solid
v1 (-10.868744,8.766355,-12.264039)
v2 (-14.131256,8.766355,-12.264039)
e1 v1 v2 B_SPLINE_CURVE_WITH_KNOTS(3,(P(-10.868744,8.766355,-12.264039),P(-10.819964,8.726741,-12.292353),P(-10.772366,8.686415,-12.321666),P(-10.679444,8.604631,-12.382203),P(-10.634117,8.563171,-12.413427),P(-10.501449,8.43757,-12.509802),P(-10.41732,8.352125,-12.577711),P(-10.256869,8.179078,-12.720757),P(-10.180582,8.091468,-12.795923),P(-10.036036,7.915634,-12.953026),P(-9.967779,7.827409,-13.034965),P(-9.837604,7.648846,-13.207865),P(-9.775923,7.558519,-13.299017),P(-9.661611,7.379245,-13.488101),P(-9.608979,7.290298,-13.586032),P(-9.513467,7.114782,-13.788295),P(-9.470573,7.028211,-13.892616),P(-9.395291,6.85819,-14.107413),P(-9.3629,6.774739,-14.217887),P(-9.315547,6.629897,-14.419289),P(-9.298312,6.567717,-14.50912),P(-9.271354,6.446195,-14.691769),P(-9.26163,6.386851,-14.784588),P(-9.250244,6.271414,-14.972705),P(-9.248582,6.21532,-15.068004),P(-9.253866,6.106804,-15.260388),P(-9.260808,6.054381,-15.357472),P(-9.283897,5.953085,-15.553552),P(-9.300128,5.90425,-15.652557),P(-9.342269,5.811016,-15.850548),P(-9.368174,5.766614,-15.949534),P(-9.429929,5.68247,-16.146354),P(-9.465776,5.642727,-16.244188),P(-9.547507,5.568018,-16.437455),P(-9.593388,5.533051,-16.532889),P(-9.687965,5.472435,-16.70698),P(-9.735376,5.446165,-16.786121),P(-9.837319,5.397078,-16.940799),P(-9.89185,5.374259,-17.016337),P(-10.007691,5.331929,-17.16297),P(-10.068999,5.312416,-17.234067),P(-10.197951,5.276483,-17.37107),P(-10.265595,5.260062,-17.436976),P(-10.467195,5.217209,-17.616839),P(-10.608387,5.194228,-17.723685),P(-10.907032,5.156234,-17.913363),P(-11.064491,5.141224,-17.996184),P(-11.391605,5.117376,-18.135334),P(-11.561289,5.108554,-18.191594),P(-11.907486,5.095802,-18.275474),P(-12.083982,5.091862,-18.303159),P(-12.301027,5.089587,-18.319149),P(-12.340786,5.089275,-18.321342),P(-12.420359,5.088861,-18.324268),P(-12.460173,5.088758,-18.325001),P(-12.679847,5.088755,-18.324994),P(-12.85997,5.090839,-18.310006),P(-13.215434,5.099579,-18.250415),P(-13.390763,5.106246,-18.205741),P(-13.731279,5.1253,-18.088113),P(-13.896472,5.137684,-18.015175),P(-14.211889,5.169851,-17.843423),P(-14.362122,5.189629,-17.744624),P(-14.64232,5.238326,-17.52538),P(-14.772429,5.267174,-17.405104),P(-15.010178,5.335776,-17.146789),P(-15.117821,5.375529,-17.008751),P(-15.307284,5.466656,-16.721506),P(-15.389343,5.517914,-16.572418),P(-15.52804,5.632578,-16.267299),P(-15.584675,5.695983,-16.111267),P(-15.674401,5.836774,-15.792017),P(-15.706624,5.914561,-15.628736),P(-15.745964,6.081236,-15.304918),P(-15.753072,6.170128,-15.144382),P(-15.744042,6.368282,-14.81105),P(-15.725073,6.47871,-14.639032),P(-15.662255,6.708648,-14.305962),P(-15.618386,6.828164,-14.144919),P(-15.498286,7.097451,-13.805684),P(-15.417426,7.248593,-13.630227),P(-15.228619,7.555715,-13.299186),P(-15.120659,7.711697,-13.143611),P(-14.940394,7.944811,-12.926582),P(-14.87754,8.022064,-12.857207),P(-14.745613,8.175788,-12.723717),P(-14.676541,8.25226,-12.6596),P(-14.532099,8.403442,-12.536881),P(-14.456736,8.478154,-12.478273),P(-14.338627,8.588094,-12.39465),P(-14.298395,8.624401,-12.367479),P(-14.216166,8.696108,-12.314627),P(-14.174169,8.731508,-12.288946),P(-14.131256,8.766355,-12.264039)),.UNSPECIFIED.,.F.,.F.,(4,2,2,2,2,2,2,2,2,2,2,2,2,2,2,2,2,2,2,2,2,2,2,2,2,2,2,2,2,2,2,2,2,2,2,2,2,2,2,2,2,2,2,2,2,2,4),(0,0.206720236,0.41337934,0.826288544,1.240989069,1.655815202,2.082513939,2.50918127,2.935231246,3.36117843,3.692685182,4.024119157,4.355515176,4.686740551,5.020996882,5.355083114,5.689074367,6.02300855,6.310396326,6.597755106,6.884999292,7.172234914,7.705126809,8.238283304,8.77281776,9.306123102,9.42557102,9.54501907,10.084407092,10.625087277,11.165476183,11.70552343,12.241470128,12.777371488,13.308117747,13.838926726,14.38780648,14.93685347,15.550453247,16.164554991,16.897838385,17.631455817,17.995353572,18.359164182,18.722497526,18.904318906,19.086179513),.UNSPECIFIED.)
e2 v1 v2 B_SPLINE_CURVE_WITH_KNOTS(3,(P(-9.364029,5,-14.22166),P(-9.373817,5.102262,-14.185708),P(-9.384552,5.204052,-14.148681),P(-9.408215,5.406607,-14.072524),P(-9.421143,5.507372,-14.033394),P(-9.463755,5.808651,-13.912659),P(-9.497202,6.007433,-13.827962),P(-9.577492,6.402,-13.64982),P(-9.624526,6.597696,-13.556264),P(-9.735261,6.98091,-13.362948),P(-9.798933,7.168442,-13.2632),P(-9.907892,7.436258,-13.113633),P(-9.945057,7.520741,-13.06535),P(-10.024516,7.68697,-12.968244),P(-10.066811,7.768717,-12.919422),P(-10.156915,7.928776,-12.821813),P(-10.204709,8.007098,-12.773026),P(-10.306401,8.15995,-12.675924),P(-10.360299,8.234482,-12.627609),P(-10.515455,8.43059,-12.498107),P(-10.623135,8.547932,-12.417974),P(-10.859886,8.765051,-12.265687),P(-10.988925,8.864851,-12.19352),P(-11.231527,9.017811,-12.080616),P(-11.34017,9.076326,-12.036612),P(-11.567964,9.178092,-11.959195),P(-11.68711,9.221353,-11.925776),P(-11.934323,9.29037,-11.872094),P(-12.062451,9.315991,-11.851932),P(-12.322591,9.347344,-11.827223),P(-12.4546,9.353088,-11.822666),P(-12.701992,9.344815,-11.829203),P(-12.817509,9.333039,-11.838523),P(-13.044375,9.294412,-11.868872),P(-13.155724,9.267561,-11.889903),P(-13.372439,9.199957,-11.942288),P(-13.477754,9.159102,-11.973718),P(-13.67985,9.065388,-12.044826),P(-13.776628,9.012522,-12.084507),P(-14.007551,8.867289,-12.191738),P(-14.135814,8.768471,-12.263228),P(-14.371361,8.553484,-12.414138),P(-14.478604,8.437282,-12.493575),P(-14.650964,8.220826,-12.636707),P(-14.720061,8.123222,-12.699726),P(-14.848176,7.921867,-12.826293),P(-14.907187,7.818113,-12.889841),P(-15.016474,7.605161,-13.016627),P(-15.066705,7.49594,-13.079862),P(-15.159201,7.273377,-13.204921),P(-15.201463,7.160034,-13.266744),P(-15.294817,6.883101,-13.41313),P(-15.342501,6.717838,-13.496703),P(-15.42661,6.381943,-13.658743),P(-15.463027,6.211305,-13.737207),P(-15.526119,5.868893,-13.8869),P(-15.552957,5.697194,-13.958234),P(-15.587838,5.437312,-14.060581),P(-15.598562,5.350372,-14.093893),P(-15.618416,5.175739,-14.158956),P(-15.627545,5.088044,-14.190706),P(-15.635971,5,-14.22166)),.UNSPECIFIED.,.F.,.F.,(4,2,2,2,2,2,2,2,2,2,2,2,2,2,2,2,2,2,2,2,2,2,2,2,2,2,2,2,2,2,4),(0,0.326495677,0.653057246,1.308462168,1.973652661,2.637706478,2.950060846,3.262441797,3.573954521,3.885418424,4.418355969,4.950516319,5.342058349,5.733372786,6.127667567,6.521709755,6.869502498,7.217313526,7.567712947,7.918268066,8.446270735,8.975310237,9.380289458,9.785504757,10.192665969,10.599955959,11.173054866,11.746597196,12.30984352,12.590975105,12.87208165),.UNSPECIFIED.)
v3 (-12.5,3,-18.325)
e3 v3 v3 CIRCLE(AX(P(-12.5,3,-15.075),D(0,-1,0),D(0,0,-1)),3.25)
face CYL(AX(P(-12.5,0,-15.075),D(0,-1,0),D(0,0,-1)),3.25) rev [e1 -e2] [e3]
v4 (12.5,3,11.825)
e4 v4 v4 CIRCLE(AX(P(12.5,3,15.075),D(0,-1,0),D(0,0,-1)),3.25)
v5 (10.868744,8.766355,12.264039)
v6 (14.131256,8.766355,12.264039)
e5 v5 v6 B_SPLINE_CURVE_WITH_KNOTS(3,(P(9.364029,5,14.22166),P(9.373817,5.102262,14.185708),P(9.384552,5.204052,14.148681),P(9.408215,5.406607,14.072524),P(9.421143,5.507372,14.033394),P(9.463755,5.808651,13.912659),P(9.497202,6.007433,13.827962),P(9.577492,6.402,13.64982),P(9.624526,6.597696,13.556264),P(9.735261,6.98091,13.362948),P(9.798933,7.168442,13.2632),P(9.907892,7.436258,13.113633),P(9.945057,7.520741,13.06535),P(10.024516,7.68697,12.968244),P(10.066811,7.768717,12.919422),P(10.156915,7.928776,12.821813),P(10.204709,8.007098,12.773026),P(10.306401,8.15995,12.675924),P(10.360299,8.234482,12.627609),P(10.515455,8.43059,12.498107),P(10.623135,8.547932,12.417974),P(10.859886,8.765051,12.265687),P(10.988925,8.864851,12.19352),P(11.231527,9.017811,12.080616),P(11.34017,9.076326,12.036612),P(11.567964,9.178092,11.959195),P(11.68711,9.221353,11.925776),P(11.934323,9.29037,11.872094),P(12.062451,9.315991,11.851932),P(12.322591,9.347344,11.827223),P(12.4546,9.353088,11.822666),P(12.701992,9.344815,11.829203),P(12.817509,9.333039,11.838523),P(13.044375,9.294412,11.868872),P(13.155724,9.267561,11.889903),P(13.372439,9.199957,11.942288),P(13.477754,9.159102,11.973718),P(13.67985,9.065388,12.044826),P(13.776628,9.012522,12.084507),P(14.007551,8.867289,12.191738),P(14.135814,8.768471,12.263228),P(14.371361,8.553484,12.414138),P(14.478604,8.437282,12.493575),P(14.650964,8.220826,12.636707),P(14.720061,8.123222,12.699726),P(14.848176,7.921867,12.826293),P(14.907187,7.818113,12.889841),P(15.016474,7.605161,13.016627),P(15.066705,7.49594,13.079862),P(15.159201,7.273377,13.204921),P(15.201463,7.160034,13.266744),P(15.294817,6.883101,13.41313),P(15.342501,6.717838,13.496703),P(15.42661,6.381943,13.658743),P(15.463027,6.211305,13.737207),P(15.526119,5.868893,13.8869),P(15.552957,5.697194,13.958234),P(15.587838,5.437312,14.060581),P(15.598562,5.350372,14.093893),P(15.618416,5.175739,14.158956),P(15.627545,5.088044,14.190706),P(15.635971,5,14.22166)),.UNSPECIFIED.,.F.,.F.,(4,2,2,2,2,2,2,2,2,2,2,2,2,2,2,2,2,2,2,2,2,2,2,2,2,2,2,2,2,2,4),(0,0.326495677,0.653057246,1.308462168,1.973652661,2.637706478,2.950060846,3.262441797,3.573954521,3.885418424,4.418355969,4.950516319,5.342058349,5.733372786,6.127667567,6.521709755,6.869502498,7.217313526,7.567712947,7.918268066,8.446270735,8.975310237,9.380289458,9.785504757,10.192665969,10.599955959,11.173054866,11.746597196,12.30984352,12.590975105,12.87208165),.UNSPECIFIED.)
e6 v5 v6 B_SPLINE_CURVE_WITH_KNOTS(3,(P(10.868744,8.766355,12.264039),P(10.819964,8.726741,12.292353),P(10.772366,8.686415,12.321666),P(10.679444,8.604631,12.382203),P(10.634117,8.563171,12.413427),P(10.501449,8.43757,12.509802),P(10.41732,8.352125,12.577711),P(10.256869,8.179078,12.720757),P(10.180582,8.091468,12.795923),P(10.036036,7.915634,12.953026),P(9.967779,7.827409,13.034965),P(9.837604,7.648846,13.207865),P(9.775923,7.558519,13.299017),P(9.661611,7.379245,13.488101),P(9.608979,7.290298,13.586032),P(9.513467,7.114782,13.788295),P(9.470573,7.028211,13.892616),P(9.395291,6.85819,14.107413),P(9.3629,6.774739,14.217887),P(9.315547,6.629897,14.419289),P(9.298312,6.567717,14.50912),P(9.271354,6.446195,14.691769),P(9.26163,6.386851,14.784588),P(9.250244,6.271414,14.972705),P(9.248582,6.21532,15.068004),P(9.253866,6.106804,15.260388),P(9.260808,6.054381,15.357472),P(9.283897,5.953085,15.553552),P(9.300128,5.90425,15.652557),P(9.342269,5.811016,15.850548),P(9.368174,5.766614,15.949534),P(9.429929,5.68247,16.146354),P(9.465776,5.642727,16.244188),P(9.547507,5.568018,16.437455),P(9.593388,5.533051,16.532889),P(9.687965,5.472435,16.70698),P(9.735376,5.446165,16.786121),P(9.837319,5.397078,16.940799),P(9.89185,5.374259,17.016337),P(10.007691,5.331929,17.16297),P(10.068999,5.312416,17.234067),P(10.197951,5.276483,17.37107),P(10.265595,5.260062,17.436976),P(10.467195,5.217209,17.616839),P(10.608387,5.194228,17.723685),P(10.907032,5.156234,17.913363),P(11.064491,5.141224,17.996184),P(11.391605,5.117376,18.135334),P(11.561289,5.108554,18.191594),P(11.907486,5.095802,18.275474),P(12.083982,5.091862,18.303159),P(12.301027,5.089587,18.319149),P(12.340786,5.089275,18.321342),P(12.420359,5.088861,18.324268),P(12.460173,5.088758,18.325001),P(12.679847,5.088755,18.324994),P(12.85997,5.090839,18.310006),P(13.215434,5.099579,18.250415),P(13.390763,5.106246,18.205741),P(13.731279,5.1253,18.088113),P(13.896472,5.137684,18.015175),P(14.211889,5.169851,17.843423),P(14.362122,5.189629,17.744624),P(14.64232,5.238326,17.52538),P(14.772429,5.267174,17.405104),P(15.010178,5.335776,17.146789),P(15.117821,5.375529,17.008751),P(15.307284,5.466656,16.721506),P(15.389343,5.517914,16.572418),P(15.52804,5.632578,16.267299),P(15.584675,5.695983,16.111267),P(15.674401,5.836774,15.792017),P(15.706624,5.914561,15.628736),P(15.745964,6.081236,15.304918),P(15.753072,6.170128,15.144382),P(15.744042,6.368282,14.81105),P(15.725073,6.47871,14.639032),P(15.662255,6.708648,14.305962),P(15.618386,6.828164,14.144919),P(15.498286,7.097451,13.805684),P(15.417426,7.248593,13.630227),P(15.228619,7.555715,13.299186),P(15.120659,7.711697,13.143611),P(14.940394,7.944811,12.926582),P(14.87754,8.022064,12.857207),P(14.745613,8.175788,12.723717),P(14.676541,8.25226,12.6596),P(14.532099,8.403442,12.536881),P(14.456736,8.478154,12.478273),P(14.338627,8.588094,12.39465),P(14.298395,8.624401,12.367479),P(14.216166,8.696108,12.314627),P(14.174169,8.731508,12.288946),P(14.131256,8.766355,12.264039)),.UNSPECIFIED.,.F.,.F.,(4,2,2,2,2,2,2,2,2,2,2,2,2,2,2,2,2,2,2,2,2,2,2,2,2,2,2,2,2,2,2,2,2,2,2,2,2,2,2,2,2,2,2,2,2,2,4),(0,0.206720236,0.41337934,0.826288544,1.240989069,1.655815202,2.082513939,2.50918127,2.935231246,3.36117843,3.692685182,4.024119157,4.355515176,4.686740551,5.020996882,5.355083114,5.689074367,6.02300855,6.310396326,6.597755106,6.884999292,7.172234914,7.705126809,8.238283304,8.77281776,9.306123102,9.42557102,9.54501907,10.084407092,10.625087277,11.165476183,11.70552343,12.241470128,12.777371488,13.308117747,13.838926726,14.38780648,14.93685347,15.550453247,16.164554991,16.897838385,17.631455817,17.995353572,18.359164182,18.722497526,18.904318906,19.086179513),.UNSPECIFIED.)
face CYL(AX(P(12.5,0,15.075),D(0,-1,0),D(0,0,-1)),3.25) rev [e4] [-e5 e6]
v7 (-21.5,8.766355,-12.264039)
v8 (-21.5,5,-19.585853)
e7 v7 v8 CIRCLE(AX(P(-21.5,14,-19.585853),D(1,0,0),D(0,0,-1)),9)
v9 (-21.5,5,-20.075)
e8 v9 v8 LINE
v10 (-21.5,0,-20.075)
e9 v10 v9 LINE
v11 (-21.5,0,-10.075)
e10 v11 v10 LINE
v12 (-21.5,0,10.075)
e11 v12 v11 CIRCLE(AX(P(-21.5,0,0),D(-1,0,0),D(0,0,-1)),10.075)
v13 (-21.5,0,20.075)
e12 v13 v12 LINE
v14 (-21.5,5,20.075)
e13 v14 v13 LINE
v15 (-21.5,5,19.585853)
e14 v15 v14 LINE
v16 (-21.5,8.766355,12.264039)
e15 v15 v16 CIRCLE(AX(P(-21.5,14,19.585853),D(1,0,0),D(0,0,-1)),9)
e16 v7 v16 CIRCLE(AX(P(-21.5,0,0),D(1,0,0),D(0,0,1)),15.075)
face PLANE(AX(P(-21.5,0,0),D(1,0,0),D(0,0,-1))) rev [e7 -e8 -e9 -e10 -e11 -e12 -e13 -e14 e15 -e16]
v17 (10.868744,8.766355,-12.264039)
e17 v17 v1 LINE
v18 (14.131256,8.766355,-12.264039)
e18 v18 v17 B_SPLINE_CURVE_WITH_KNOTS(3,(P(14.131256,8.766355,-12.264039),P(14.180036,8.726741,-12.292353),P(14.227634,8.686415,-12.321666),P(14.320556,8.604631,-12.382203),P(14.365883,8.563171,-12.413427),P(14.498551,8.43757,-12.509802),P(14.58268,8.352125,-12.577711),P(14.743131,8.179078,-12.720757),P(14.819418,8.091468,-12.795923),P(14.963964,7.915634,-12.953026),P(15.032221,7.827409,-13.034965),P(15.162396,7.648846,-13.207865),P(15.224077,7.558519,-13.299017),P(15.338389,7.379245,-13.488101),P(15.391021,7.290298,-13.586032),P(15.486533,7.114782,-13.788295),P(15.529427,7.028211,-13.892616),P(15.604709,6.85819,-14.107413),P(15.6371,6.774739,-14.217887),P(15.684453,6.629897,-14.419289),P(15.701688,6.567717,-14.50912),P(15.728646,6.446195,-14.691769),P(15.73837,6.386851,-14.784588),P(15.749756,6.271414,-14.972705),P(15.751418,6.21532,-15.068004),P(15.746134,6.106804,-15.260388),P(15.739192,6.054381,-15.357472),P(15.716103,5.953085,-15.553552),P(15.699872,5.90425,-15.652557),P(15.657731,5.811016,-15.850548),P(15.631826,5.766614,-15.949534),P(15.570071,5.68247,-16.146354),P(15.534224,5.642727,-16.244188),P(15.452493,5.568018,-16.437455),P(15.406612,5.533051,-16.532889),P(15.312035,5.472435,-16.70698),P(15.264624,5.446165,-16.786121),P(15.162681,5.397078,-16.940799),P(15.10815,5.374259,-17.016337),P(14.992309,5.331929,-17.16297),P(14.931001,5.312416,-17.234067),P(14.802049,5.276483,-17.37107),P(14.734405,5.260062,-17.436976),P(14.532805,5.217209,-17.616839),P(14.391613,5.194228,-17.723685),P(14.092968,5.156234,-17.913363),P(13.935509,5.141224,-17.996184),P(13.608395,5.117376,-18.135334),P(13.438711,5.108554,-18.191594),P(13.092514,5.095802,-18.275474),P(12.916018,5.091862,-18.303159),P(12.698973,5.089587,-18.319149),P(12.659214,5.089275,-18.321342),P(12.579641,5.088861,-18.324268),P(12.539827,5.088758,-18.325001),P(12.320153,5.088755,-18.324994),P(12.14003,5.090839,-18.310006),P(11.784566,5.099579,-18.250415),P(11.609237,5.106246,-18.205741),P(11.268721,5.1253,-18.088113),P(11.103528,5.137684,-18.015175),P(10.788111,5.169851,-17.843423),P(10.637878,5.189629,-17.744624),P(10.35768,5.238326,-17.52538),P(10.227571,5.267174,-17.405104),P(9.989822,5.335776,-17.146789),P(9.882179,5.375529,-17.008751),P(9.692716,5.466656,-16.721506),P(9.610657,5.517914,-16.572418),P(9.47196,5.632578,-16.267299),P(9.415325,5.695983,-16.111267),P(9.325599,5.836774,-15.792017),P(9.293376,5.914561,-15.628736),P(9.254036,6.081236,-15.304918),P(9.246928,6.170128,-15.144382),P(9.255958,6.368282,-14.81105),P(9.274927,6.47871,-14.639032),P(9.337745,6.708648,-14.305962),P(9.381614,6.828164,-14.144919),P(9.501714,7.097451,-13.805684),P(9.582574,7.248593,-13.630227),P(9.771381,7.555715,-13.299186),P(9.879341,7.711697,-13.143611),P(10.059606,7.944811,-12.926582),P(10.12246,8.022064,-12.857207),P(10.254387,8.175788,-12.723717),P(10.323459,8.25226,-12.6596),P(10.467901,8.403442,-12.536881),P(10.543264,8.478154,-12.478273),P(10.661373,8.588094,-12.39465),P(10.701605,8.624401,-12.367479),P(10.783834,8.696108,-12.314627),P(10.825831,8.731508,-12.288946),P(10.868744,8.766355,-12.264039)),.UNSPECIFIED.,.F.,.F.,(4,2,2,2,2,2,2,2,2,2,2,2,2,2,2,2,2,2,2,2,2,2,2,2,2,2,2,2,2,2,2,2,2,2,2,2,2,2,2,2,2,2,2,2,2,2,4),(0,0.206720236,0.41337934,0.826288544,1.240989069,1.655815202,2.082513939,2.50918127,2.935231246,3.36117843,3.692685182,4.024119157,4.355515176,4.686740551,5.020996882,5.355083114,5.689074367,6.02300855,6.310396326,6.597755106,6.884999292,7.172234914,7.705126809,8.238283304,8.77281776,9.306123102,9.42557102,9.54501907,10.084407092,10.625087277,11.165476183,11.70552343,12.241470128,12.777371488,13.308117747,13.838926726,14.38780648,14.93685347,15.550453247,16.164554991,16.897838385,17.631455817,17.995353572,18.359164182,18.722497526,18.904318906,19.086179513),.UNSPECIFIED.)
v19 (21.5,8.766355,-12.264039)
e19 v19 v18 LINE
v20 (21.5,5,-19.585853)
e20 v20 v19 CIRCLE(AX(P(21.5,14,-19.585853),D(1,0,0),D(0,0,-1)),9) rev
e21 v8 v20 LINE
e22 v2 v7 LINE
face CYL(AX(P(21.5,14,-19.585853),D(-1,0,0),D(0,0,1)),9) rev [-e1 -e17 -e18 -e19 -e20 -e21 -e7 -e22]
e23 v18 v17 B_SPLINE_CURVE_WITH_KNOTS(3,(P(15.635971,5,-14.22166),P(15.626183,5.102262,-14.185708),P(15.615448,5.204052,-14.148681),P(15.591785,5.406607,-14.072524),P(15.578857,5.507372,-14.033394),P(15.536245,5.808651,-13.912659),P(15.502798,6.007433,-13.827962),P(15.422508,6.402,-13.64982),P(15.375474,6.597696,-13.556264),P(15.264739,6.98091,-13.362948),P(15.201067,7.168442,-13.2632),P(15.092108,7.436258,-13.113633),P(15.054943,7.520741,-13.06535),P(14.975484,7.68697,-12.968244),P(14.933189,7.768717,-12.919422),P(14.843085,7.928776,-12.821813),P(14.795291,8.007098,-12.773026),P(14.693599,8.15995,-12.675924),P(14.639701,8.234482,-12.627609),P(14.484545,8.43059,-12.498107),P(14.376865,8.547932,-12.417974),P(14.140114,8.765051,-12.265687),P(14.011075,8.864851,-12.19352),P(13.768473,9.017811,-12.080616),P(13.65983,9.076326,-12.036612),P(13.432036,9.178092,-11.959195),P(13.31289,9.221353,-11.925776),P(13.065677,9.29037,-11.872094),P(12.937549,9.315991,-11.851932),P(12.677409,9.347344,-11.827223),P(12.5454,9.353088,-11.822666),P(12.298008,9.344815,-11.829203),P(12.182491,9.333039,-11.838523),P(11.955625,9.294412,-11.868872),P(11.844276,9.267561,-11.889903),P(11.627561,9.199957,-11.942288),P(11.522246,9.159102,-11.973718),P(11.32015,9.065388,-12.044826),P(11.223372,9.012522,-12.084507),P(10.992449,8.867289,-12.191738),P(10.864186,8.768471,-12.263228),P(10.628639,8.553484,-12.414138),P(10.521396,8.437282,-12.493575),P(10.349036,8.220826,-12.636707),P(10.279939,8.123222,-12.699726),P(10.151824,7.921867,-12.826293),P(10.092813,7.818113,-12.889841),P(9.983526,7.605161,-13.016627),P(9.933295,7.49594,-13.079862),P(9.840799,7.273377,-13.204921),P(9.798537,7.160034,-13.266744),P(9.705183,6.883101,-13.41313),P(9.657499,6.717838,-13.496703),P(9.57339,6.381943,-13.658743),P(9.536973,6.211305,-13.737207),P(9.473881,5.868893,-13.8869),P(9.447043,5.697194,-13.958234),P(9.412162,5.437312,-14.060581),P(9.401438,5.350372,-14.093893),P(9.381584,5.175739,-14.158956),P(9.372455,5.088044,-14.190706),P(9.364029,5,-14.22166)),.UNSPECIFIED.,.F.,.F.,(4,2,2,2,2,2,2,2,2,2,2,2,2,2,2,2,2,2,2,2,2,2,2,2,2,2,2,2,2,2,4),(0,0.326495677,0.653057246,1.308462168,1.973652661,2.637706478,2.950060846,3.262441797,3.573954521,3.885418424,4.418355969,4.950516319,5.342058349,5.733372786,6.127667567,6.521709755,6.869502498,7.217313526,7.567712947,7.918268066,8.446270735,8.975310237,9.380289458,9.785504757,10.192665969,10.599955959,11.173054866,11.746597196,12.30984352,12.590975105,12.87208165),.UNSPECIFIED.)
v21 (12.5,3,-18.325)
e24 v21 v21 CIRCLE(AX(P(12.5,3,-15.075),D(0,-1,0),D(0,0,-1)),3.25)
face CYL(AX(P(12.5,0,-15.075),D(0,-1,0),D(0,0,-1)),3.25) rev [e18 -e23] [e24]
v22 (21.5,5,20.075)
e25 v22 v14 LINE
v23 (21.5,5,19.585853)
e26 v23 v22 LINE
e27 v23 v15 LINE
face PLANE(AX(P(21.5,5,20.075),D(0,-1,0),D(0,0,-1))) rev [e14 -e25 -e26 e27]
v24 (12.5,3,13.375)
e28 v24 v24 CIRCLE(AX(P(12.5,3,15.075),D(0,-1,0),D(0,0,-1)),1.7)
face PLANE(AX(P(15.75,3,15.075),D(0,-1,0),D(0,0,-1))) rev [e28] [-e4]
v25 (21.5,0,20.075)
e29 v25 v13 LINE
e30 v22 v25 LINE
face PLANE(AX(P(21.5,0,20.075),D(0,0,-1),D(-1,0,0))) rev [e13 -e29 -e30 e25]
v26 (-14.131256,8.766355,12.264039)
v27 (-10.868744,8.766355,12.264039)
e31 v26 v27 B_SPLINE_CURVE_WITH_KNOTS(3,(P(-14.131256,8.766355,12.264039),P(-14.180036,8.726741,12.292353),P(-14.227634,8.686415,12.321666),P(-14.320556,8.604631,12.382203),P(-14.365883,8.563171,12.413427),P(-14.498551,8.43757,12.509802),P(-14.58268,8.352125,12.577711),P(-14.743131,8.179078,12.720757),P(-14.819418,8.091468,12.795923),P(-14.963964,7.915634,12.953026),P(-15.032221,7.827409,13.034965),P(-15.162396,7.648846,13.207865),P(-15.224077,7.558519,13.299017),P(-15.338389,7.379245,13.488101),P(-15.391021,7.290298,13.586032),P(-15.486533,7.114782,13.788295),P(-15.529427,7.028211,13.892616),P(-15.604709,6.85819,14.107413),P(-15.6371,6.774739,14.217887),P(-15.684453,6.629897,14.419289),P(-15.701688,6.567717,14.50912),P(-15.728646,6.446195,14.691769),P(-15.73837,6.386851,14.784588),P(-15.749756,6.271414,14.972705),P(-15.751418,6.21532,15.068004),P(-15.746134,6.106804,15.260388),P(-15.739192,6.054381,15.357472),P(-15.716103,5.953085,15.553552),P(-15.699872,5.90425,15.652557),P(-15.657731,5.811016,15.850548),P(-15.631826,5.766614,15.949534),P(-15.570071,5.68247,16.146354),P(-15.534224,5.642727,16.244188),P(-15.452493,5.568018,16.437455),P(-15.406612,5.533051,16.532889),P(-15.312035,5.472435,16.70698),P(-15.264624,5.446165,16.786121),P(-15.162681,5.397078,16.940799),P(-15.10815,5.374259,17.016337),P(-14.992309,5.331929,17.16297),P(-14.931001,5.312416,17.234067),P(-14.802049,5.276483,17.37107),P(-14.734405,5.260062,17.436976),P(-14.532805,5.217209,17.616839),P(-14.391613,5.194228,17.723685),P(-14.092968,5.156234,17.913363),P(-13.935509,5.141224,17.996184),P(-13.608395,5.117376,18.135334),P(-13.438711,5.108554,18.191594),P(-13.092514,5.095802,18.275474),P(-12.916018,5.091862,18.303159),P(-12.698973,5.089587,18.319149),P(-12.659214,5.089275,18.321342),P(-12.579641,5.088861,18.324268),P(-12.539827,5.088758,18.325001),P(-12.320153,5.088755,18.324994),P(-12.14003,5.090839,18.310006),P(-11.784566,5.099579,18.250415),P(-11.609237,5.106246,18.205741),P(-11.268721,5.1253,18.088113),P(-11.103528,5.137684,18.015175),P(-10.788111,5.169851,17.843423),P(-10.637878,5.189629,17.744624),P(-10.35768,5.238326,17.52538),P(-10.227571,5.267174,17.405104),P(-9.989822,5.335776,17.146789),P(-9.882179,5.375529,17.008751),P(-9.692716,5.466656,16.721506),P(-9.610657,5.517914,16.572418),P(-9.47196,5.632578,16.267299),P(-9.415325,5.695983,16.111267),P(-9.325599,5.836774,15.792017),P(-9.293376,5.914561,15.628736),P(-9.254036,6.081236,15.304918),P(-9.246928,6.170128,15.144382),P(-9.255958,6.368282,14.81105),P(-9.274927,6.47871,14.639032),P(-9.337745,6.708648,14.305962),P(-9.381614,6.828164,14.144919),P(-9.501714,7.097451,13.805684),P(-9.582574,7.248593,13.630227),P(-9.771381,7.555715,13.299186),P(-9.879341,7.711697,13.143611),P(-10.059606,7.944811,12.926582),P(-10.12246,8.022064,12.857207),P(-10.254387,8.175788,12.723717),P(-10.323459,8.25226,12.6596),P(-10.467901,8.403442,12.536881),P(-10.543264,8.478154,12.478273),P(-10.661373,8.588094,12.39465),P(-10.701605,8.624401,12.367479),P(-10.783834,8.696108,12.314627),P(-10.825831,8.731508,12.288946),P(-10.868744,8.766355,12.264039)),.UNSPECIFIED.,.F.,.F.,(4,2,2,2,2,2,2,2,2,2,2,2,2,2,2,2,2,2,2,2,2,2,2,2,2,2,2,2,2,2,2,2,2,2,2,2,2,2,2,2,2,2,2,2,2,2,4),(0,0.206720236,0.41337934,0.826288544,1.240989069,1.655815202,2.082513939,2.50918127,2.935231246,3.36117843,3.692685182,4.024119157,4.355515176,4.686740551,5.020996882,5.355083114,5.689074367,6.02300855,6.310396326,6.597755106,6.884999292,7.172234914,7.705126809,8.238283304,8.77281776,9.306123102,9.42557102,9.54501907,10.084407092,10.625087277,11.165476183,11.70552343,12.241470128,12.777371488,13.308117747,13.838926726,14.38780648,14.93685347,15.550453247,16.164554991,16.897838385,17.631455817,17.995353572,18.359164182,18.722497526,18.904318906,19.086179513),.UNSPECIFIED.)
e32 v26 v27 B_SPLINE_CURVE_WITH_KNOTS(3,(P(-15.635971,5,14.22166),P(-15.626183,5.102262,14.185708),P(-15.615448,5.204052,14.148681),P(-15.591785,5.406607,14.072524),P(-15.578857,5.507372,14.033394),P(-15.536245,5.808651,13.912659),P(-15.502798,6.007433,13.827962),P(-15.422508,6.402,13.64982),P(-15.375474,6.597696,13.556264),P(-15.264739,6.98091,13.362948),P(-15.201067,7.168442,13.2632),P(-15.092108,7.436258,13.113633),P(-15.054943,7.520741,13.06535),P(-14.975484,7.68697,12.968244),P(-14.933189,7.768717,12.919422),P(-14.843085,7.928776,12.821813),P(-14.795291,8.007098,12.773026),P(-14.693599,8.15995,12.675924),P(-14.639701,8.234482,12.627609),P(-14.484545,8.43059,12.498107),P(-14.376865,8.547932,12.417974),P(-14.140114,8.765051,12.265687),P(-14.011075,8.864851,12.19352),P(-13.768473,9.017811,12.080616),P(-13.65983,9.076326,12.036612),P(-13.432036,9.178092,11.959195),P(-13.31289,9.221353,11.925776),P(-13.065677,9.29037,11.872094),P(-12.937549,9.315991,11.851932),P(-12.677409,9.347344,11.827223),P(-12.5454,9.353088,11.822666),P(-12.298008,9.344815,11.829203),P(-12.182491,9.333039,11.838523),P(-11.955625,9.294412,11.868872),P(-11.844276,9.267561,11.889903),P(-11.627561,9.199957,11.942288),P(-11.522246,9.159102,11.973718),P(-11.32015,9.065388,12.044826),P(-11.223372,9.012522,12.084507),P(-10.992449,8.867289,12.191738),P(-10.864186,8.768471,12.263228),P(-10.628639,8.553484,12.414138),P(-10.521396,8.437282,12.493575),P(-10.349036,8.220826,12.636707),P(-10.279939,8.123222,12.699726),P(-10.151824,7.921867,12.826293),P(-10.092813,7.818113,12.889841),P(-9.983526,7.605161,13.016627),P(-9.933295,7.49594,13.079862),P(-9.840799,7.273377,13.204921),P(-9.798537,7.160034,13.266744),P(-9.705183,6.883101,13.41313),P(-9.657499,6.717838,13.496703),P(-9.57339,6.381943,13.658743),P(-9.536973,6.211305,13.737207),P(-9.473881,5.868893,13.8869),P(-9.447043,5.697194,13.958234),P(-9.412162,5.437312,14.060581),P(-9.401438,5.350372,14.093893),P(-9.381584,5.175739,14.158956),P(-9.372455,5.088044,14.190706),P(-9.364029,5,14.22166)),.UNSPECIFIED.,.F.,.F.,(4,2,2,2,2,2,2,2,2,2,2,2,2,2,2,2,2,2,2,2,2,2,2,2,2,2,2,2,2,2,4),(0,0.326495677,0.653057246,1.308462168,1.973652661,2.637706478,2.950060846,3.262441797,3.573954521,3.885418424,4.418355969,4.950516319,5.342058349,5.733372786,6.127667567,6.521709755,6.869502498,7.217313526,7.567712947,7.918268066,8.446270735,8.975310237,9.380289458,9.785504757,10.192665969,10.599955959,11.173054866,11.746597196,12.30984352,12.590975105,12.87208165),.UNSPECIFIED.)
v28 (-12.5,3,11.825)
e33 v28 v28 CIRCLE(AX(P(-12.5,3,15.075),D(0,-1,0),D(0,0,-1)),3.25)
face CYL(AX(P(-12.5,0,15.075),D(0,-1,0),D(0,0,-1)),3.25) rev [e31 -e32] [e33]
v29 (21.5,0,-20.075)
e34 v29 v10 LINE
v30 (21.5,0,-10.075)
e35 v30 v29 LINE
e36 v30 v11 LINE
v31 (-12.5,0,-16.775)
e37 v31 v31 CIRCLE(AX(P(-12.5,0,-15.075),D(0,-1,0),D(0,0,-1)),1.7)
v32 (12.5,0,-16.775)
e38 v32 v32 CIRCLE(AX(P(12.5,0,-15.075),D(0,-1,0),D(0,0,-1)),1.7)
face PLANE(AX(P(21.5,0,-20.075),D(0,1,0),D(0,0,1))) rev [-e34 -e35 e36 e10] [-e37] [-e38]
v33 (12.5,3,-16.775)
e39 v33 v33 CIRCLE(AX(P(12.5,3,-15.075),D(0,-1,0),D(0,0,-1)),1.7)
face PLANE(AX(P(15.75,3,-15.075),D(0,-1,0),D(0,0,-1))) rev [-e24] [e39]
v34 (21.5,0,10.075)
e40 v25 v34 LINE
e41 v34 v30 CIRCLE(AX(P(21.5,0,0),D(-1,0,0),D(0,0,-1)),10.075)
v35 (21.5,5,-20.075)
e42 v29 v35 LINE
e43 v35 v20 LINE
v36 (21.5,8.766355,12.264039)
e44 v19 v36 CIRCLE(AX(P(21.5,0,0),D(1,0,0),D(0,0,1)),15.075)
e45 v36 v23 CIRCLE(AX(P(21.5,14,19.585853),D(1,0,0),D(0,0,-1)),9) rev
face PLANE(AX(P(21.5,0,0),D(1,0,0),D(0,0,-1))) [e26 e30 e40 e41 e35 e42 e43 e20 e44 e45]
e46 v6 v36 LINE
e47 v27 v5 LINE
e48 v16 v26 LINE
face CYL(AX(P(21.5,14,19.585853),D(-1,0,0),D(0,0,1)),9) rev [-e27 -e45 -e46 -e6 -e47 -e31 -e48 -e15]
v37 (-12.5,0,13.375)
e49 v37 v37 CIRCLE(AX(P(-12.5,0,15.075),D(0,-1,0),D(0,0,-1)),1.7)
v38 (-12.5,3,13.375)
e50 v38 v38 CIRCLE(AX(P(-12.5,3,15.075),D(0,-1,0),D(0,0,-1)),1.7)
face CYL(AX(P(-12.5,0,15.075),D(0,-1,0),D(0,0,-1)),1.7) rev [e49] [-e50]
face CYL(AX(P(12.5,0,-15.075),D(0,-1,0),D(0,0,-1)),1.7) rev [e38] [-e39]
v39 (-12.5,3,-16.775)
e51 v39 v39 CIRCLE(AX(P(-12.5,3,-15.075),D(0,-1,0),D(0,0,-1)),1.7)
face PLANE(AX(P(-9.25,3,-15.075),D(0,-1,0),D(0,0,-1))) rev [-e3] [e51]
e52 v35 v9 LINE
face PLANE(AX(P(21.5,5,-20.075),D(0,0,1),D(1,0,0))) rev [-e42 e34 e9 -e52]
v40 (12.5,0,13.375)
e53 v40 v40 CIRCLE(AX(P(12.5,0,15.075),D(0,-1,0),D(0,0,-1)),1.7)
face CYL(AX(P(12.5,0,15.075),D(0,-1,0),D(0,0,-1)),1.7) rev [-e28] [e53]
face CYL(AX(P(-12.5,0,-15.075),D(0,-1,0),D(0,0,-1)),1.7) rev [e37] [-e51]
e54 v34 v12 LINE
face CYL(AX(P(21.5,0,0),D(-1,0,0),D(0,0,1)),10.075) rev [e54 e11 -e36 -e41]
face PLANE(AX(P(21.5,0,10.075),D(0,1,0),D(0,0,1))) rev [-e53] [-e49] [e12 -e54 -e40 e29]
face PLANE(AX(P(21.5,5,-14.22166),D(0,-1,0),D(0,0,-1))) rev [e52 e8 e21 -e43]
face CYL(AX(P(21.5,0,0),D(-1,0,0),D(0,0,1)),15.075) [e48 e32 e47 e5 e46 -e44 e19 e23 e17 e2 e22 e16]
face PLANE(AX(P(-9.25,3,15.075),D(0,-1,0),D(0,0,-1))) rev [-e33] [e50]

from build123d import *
from build123d.topology import SkipClean

# Parameters (mm, degrees)
BOSS_EXTRUDE1_DEPTH           = 21.5
CBORE_FOR_M3_SHCS1_AT_2_COUNT = 2
CBORE_FOR_M3_SHCS1_AT_2_PITCH = 25
FILLET1_START                 = -21.5
FILLET1_DEPTH                 = 43
FILLET1_START_2               = 5
FILLET1_2_OUTLINE_R           = 3.25
FILLET1_2_DEPTH               = 4.350124689


with BuildPart() as part:
    # Sketch1 → Boss-Extrude1 (new, symmetric)
    with BuildSketch(Plane(origin=(0, 0, 0), x_dir=(0, 0, -1), z_dir=(1, 0, 0))):
        with BuildLine():
            Line((-10.075, 0), (-20.075, 0))
            Line((-20.075, 0), (-20.075, 5))
            Line((-20.075, 5), (-14.221660416, 5))
            ThreePointArc((-14.221660416, 5), (0, 15.075), (14.221660416, 5))
            Line((14.221660416, 5), (20.075, 5))
            Line((20.075, 5), (20.075, 0))
            Line((20.075, 0), (10.075, 0))
            ThreePointArc((10.075, 0), (0, 10.075), (-10.075, 0))
        make_face()
    extrude(amount=BOSS_EXTRUDE1_DEPTH, both=True)

    # Sketch4 → CBORE for M3 SHCS1 (revolve, cut)
    with BuildSketch(Plane(origin=(12.5, 0, 15.075), x_dir=(0, 0, -1), z_dir=(1, 0, 0))):
        Polygon((0, 0), (0, 15.075), (3.25, 15.075), (3.25, 3), (1.7, 3), (1.7, 0), align=None)
    cbore_for_m3_shcs1 = revolve(axis=Axis((12.5, -6.35, 15.075), (0, 1, 0)), mode=Mode.SUBTRACT)

    # CBORE for M3 SHCS1 at 2: CBORE for M3 SHCS1 ×2
    with Locations(*[(-i * CBORE_FOR_M3_SHCS1_AT_2_PITCH, 0, 0) for i in range(1, CBORE_FOR_M3_SHCS1_AT_2_COUNT)]):
        add(cbore_for_m3_shcs1, mode=Mode.SUBTRACT)

    # Mirror1: CBORE for M3 SHCS1 across plane
    add(cbore_for_m3_shcs1.mirror(Plane.XY), mode=Mode.SUBTRACT)

    # Mirror1 copy 1 sketch → Mirror1 copy 1 (revolve, cut)
    with BuildSketch(Plane(origin=(-12.5, 0, -15.075), x_dir=(0, 0, 1), z_dir=(1, 0, 0))):
        Polygon((0, 0), (0, -15.075), (3.25, -15.075), (3.25, -3), (1.7, -3), (1.7, 0), align=None)
    revolve(axis=Axis((-12.5, -6.35, -15.075), (0, -1, 0)), mode=Mode.SUBTRACT)

    # Fillet1: read off the stored shape, not the designer's step
    # Fillet1 outline → Fillet1 (add)
    with BuildSketch(Plane.YZ.offset(FILLET1_START)):
        with BuildLine():
            Line((5, -14.221660416), (5, -19.585852675))
            ThreePointArc((5, -19.585852675), (5.996788028, -15.468985161), (8.76635514, -12.264038591))
            ThreePointArc((8.76635514, -12.264038591), (6.952424344, -13.376076433), (5, -14.221660416))
        make_face()
        with BuildLine():
            ThreePointArc((5, 14.221660416), (6.952424344, 13.376076433), (8.76635514, 12.264038591))
            ThreePointArc((8.76635514, 12.264038591), (5.996788028, 15.468985161), (5, 19.585852675))
            Line((5, 19.585852675), (5, 14.221660416))
        make_face()
    extrude(amount=FILLET1_DEPTH)

    # Fillet1 2 outline → Fillet1 2 (cut)
    with SkipClean():  # the faces are left unmerged after this step: merging them gives an invalid solid
        with BuildSketch(Plane(origin=(0, 0, 0), x_dir=(1, 0, 0), z_dir=(0, 1, 0)).offset(FILLET1_START_2)):
            with Locations((12.5, 15.075)):
                Circle(FILLET1_2_OUTLINE_R)
            with Locations((-12.5, 15.075)):
                Circle(FILLET1_2_OUTLINE_R)
            with Locations((12.5, -15.075)):
                Circle(FILLET1_2_OUTLINE_R)
            with Locations((-12.5, -15.075)):
                Circle(FILLET1_2_OUTLINE_R)
        extrude(amount=FILLET1_2_DEPTH, mode=Mode.SUBTRACT)


solid = part.part
